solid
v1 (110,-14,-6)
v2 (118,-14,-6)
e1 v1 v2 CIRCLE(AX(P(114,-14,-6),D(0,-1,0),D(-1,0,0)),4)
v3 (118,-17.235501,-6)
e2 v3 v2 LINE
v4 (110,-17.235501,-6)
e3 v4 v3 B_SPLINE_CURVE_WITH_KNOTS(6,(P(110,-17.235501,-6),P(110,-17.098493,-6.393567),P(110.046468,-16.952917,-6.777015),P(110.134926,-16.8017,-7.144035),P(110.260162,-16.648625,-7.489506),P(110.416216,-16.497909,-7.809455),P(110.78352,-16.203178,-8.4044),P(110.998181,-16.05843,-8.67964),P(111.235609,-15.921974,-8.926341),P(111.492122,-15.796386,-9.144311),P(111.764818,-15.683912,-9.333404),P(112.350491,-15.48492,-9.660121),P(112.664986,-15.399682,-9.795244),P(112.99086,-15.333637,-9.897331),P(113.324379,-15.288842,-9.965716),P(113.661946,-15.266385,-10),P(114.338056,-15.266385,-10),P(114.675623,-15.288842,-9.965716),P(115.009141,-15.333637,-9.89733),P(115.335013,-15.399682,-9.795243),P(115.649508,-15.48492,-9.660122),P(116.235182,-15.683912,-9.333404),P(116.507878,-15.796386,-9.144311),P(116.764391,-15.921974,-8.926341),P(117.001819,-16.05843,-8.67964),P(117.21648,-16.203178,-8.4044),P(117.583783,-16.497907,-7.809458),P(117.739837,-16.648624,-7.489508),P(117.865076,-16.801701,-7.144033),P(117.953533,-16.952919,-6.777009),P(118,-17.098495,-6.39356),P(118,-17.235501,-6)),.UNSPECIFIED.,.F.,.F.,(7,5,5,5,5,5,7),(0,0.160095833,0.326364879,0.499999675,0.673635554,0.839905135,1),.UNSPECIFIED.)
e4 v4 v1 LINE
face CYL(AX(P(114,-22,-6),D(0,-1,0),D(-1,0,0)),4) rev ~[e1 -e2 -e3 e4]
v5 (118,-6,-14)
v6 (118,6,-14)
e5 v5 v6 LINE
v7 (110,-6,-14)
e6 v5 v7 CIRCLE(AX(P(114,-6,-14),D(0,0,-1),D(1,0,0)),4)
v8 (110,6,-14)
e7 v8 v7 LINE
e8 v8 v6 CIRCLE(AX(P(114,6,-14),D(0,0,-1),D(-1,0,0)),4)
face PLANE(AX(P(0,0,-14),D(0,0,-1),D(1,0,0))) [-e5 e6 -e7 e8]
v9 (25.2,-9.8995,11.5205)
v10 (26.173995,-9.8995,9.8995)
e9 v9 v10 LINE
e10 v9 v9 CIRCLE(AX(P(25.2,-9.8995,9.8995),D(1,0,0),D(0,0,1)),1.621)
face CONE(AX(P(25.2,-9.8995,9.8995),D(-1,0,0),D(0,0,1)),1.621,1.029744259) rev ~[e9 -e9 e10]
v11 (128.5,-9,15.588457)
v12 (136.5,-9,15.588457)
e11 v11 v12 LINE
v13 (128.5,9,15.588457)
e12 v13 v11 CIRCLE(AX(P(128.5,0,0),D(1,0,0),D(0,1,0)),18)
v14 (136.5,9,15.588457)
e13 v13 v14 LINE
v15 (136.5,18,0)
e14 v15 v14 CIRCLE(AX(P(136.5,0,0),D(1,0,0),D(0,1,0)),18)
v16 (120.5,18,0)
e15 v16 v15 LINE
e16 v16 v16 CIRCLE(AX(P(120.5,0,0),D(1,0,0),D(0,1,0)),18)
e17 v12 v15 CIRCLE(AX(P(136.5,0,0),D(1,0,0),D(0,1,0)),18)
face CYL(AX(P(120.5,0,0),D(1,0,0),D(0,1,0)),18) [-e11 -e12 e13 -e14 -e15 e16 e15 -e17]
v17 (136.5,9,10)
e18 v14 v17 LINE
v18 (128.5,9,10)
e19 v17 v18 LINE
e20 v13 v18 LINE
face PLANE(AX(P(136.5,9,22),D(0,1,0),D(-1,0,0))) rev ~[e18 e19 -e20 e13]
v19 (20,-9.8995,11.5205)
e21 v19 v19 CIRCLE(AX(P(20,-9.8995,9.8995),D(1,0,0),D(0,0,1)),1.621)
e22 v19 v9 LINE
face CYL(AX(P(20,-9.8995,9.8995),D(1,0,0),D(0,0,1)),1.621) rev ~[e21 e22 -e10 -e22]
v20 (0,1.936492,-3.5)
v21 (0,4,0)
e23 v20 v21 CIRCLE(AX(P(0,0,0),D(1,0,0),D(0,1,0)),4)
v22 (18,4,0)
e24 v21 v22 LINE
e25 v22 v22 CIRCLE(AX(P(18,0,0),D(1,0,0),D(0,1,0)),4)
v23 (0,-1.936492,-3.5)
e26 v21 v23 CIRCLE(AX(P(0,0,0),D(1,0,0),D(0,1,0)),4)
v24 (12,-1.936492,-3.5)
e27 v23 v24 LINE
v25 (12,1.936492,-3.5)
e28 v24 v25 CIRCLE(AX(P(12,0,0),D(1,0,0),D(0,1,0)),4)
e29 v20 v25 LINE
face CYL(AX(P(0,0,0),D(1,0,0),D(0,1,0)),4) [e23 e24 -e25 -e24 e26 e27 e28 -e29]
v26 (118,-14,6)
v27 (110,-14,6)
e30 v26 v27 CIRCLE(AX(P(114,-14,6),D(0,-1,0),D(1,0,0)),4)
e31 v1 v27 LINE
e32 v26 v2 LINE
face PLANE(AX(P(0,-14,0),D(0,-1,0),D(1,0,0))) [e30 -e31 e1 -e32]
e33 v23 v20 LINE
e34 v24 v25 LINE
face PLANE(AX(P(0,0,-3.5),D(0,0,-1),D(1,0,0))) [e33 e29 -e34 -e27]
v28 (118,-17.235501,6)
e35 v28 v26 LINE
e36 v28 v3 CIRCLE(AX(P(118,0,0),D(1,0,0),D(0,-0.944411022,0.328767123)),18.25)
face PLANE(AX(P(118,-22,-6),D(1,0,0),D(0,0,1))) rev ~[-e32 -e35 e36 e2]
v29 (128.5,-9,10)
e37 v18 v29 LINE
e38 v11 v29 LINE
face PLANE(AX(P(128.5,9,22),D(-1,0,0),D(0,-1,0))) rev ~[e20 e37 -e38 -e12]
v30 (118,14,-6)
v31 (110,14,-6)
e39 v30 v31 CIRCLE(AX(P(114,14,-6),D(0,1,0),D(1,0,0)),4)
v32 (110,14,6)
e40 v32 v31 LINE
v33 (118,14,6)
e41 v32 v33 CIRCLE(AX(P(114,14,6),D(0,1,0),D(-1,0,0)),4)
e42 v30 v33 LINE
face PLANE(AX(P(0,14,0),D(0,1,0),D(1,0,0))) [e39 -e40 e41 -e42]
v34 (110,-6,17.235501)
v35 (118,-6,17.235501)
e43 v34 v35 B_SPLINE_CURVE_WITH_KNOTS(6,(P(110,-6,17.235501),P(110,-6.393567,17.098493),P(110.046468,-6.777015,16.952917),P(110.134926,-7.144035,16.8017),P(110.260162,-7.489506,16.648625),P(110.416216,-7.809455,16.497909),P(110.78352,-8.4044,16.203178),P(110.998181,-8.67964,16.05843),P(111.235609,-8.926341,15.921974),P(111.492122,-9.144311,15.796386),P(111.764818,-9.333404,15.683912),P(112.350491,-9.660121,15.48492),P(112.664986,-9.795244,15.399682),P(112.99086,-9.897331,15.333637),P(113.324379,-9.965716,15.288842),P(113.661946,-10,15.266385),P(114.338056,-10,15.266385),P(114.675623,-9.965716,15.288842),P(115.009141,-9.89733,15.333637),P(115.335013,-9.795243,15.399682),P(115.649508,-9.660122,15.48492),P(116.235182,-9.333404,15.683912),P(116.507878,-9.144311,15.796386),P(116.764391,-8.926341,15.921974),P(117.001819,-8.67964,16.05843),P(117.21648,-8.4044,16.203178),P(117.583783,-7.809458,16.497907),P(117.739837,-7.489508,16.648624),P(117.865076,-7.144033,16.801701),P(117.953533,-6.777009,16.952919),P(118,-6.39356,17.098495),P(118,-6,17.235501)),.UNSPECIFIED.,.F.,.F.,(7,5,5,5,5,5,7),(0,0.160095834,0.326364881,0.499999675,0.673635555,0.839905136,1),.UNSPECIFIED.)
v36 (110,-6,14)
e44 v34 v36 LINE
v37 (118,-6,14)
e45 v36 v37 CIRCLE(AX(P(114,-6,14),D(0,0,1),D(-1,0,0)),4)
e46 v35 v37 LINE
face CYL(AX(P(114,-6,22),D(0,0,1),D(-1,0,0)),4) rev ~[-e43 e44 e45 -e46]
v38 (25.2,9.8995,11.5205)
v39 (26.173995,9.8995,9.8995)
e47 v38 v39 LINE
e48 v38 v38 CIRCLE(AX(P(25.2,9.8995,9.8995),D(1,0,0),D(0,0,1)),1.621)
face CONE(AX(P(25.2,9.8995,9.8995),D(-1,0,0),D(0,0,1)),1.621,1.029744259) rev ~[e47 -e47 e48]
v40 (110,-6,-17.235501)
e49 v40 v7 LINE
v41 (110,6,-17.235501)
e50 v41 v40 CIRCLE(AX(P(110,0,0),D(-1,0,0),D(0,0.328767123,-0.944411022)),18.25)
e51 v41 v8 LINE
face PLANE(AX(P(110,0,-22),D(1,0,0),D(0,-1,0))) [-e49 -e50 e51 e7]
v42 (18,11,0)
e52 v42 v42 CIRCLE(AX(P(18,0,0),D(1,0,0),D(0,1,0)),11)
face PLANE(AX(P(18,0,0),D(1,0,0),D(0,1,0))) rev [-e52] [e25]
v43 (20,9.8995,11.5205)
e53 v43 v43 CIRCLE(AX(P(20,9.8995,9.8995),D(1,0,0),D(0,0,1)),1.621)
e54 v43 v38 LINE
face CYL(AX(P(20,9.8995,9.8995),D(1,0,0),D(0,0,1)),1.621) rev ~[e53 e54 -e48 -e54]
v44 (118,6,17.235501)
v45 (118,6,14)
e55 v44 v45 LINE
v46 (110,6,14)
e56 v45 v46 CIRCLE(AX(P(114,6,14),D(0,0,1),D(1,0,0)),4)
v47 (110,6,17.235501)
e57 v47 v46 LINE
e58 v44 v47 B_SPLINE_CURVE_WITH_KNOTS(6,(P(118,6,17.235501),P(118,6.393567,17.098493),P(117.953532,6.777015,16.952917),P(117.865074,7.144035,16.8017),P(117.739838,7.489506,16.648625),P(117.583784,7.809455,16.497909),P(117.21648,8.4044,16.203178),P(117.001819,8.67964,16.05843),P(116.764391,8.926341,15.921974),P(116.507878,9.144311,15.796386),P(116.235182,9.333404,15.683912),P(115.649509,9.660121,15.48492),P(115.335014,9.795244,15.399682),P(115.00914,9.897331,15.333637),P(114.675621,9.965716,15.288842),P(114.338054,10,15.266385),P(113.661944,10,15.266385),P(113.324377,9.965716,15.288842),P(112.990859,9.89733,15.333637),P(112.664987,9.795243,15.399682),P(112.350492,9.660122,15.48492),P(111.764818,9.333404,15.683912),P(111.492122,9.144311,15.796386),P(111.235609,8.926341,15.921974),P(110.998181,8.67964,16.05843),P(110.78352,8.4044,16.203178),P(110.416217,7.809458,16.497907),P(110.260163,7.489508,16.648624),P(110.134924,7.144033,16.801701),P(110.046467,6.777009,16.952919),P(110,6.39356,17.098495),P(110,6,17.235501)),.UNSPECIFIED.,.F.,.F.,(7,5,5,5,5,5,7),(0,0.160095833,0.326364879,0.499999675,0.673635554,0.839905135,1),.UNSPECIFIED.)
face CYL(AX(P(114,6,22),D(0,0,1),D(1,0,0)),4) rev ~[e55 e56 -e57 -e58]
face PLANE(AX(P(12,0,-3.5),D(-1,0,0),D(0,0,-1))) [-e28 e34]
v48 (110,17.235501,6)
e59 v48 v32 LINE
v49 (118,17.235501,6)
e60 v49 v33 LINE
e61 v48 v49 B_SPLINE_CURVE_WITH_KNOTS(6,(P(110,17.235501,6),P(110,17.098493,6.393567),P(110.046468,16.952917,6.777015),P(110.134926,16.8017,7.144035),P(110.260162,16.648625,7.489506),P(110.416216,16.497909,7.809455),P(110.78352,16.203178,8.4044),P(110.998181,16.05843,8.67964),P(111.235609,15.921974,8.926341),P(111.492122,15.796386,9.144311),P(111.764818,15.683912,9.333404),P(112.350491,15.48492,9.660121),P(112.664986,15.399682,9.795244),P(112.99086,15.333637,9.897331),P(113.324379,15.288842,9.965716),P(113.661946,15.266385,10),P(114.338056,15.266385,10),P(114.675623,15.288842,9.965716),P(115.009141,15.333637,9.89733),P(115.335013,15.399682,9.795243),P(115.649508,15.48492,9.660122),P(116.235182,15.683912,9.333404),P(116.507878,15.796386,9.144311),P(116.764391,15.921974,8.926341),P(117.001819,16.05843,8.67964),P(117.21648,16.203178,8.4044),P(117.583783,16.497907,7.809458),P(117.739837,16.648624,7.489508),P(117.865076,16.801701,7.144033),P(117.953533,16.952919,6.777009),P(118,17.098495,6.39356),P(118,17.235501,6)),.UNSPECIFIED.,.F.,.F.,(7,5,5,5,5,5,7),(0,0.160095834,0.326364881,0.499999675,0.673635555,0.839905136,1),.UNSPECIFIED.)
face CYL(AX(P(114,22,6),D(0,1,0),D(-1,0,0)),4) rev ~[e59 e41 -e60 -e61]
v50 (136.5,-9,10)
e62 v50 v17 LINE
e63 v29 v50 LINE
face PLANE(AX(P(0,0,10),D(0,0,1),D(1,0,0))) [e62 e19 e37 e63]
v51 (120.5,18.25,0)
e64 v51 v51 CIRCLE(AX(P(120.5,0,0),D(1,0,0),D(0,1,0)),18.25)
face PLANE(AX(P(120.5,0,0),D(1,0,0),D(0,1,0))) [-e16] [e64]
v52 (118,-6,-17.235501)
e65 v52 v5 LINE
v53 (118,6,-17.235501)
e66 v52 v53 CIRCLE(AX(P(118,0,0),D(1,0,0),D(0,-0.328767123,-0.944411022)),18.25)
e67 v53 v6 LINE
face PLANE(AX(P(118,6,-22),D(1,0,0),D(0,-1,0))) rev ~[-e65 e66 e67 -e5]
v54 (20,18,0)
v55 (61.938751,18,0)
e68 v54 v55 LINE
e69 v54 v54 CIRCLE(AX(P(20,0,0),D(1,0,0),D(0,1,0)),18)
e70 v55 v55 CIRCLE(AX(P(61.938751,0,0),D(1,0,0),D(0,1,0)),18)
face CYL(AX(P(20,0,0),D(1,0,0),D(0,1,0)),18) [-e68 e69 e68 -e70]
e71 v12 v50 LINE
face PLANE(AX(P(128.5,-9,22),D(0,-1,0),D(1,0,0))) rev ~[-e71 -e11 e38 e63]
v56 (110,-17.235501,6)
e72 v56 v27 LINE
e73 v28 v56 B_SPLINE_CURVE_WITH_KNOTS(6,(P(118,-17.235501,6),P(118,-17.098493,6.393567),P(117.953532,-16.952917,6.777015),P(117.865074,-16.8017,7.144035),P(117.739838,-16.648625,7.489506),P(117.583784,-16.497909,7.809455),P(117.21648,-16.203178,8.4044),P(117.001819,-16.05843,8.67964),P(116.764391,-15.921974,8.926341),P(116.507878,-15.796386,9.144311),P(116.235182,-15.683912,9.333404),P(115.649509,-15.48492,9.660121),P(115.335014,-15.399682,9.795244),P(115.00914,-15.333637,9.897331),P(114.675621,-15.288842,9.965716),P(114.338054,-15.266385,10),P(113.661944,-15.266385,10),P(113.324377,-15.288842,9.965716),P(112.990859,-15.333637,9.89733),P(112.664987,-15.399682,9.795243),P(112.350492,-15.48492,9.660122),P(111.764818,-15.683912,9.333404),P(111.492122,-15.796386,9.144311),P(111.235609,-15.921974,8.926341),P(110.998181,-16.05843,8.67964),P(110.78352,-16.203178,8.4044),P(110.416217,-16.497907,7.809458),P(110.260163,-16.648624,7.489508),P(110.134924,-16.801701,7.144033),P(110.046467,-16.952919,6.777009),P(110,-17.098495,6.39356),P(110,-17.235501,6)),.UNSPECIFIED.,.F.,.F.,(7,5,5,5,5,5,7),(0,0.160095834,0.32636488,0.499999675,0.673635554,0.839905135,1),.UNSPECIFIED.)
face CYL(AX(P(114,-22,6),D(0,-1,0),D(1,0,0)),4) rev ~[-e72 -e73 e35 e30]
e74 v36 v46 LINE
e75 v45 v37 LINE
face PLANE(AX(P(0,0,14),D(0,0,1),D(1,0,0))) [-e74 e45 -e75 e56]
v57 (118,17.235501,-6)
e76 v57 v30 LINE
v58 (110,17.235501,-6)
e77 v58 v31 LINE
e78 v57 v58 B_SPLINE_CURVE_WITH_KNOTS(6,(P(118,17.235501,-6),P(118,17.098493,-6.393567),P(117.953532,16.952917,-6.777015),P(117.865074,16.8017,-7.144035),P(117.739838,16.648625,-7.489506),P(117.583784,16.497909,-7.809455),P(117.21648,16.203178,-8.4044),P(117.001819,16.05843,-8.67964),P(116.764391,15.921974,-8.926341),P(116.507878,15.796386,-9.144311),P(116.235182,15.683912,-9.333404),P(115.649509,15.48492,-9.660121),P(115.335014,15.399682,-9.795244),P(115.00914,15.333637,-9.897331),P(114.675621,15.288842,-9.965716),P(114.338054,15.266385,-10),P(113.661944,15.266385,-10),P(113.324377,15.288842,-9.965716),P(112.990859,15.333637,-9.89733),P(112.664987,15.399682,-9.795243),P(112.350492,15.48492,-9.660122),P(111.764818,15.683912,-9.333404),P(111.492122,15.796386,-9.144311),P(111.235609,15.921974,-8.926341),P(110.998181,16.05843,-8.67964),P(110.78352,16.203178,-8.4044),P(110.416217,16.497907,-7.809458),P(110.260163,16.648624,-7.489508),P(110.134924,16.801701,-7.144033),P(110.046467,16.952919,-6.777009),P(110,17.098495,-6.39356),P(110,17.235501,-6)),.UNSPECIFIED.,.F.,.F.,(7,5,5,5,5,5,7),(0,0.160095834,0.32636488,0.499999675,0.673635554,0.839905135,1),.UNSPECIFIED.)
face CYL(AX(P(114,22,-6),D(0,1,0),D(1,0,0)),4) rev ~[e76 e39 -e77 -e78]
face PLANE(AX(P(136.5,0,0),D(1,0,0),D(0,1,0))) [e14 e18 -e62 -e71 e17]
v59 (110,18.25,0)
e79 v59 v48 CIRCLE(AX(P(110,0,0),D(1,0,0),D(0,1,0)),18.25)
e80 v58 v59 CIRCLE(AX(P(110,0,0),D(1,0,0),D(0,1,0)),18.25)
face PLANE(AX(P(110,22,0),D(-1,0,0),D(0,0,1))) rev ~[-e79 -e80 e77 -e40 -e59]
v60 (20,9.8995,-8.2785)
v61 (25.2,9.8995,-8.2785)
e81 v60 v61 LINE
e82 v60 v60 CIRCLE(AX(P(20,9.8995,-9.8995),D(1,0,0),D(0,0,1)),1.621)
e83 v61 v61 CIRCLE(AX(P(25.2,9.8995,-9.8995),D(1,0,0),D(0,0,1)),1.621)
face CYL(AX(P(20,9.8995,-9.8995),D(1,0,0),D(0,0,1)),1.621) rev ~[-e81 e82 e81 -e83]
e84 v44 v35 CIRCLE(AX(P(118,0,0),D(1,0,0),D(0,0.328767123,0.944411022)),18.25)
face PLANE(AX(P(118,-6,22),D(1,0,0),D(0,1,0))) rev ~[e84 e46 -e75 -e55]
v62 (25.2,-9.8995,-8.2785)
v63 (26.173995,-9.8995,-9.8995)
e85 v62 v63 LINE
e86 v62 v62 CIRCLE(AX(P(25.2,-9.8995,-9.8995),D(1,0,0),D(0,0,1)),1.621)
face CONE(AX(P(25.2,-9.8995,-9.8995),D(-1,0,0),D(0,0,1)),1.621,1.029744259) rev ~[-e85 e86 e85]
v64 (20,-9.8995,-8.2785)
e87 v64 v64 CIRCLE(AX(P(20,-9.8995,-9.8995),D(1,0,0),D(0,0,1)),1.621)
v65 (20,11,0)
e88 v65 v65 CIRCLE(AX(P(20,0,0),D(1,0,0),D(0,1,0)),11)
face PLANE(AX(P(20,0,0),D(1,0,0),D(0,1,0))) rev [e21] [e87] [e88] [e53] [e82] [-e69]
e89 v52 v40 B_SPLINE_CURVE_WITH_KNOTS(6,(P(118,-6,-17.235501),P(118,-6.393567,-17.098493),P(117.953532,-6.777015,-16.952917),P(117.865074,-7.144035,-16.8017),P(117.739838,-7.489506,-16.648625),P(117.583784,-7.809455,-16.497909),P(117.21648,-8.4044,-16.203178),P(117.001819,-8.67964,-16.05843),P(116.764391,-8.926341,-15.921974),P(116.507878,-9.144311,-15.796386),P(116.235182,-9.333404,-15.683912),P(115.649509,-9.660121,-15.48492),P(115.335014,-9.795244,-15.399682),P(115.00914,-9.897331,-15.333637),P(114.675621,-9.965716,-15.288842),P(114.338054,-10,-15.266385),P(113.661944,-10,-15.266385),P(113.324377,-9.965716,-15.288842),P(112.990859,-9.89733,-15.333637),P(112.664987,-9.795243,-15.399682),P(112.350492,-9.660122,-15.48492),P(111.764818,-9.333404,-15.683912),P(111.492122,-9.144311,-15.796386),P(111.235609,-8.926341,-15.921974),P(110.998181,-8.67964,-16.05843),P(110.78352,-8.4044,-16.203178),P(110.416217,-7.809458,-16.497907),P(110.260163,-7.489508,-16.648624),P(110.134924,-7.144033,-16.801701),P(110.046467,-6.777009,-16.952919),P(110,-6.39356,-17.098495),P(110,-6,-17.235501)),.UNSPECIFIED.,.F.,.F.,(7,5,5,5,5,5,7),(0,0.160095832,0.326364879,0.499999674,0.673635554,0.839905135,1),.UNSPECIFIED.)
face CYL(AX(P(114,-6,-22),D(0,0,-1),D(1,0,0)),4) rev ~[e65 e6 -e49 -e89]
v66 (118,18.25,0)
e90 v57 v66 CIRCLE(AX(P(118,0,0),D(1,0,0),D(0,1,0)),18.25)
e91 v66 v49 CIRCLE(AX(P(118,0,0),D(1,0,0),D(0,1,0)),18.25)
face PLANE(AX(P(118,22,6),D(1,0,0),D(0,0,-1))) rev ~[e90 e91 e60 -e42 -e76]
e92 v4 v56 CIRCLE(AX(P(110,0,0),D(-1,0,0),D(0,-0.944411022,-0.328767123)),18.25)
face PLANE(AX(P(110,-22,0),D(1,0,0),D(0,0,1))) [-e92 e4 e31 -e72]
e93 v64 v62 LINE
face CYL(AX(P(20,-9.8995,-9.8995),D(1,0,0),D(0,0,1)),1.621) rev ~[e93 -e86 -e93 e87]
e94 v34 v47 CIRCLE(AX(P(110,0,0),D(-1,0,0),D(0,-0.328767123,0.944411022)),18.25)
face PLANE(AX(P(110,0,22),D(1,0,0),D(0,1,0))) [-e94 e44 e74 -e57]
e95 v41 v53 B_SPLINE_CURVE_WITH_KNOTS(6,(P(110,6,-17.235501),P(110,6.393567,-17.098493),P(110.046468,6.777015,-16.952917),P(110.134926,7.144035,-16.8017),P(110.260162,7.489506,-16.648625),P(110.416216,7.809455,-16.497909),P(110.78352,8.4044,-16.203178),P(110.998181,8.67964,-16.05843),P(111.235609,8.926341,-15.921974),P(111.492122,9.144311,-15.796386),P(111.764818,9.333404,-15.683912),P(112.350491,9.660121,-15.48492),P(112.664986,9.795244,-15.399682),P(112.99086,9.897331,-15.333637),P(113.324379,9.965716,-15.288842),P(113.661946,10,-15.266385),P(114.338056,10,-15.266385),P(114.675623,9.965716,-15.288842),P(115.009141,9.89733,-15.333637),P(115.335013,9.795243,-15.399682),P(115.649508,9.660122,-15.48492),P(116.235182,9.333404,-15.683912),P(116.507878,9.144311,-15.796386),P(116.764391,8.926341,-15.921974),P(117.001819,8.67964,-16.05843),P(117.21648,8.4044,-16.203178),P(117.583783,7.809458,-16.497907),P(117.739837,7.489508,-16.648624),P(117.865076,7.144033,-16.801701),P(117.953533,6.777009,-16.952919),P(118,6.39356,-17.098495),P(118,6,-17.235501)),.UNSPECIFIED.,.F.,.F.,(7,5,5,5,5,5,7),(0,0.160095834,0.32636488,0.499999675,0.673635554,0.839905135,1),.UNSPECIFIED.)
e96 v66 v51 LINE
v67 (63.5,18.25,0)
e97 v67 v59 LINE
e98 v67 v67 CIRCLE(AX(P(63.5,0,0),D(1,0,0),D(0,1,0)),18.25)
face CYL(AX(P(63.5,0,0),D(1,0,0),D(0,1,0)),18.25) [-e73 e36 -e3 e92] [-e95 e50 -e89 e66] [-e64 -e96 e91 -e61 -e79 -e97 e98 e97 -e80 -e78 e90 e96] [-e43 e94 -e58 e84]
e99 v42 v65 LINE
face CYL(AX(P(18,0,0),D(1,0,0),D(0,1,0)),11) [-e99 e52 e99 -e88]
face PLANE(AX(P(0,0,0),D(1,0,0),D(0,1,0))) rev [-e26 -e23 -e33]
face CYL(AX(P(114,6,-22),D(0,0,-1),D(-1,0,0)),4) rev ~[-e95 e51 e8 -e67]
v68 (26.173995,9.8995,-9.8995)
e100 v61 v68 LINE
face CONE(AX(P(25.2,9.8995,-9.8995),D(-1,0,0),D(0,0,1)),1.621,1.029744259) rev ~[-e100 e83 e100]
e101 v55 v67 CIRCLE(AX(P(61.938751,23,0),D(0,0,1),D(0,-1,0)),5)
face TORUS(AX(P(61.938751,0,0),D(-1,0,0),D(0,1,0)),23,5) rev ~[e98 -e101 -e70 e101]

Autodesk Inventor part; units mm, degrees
ref_plane "YZ Plane" through (0, 0, 0) normal (1, 0, 0) x (0, 1, 0)
ref_plane "XZ Plane" through (0, 0, 0) normal (0, 1, 0) x (-1, 0, 0)
sketch "Эскиз1" plane through (0, 0, 0) normal (0, 0, 1) x (1, 0, 0)
  line L0 (0, 0) -> (0, 4)
  line L1 (0, 4) -> (18, 4)
  line L2 (18, 4) -> (18, 11)
  line L3 (18, 11) -> (20, 11)
  line L4 (20, 11) -> (20, 18)
  line L5 (20, 18) -> (63.5, 18)
  line L6 (63.5, 18.25) -> (120.5, 18.25)
  line L7 (120.5, 18.25) -> (120.5, 18)
  line L8 (120.5, 18) -> (136.5, 18)
  line L9 (136.5, 18) -> (136.5, 0)
  line L10 (0, 0) -> (136.5, 0)
  line L11 (63.5, 18) -> (63.5, 18.25)
  point P0 (63, 17.5)
  point P1 (63, 17.5)
  dimension "d5" = 20
  dimension "d6" = 2
  dimension "d7" = 8
  dimension "d8" = 22
  dimension "d9" = 36
  dimension "d11" = 36.5
  dimension "d12" = 43.5
  dimension "d14" = 57
  dimension "d15" = 16
revolve "Вращение1" add sketch "Эскиз1" angle 360 about axis through (0, 0, 0) along (1, 0, 0)
fillet "Сопряжение1" radius 5 1 edges at (63.5, -18, 0)
sketch "Эскиз2" plane through (0, 0, 0) normal (0, 1, 0) x (-1, 0, 0)
  line L0 (0, 4) -> (0, -4) projected
  line L1 (0, -3.5) -> (-12, -3.5)
  line L2 (-12, -3.5) -> (-12, -6.5419)
  line L3 (-12, -6.5419) -> (0, -6.5419)
  line L4 (0, -3.1455) -> (0, -6.5419)
  point P0 (0, 0)
  point P1 (0, 0)
  dimension "d20" = 3.5
  dimension "d21" = 12
extrude "Выдавливание1" cut sketch "Эскиз2" along normal mid plane 10
ref_plane "РабПлоскость1" through (0, 0, 22) normal (0, 0, 1) x (1, 0, 0)
sketch "Эскиз3" plane through (0, 0, 22) normal (0, 0, 1) x (1, 0, 0)
  line L0 (110, 0) -> (110, -6)
  line L1 (118, -6) -> (118, 0)
  arc A0 (110, -6) -> (118, -6) centre (114, -6) ccw
  line L2 (110, 0) -> (118, 0) construction
  line L3 (110, 0) -> (110, 6)
  line L4 (118, 6) -> (118, 0)
  arc A1 (118, 6) -> (110, 6) centre (114, 6) ccw
  point P0 (0, 0)
  dimension "d23" = 12
  dimension "d24" = 8
  dimension "d25" = 110
extrude "Выдавливание2" cut sketch "Эскиз3" against normal blind 8
pattern_circular "Круговой массив1" count 4 over 360 about axis through (92, 0, 0) along (1, 0, 0) of "Выдавливание2"
sketch "Эскиз4" plane through (0, 0, 22) normal (0, 0, 1) x (1, 0, 0)
  line L0 (148, 9) -> (128.5, 9)
  line L1 (128.5, 9) -> (128.5, -9)
  line L2 (128.5, -9) -> (136.5, -9)
  line L3 (136.5, -18) -> (136.5, 18) projected
  point P0 (0, 0)
  point P1 (136.5, 9)
  dimension "d31" = 8
  dimension "d32" = 18
  dimension "d33" = 9
extrude "Выдавливание3" cut sketch "Эскиз4" against normal blind 12
sketch "Эскиз5" plane through (20, 0, 0) normal (-1, 0, 0) x (0, 0, 1)
  arc A0 (-3.5, -1.9365) -> (-3.5, 1.9365) centre (0, 0) ccw projected
  circle A1 centre (0, 0) radius 14
  line L0 (0, 0) -> (0, -31.2) construction
  line L1 (0, 0) -> (9.8995, -9.8995) construction
  point P0 (9.8995, 9.8995)
  point P1 (-9.8995, 9.8995)
  point P2 (-9.8995, -9.8995)
  dimension "d43" = 28
  dimension "d44" = 45
  dimension "d47" = 360
hole "Отверстие1" at (20, -9.8995, 9.8995) at (20, 9.8995, 9.8995) at (20, 9.8995, -9.8995) at (20, -9.8995, -9.8995) direction (1, 0, 0) diameter 3.242 depth 5.2 tip angle 118 thread size "M4x0.7" class "6H" standard "ISO Metric profile"
properties part number "CHP-42GP-775 ABHL" material "Алюминий 6061-AHC"
